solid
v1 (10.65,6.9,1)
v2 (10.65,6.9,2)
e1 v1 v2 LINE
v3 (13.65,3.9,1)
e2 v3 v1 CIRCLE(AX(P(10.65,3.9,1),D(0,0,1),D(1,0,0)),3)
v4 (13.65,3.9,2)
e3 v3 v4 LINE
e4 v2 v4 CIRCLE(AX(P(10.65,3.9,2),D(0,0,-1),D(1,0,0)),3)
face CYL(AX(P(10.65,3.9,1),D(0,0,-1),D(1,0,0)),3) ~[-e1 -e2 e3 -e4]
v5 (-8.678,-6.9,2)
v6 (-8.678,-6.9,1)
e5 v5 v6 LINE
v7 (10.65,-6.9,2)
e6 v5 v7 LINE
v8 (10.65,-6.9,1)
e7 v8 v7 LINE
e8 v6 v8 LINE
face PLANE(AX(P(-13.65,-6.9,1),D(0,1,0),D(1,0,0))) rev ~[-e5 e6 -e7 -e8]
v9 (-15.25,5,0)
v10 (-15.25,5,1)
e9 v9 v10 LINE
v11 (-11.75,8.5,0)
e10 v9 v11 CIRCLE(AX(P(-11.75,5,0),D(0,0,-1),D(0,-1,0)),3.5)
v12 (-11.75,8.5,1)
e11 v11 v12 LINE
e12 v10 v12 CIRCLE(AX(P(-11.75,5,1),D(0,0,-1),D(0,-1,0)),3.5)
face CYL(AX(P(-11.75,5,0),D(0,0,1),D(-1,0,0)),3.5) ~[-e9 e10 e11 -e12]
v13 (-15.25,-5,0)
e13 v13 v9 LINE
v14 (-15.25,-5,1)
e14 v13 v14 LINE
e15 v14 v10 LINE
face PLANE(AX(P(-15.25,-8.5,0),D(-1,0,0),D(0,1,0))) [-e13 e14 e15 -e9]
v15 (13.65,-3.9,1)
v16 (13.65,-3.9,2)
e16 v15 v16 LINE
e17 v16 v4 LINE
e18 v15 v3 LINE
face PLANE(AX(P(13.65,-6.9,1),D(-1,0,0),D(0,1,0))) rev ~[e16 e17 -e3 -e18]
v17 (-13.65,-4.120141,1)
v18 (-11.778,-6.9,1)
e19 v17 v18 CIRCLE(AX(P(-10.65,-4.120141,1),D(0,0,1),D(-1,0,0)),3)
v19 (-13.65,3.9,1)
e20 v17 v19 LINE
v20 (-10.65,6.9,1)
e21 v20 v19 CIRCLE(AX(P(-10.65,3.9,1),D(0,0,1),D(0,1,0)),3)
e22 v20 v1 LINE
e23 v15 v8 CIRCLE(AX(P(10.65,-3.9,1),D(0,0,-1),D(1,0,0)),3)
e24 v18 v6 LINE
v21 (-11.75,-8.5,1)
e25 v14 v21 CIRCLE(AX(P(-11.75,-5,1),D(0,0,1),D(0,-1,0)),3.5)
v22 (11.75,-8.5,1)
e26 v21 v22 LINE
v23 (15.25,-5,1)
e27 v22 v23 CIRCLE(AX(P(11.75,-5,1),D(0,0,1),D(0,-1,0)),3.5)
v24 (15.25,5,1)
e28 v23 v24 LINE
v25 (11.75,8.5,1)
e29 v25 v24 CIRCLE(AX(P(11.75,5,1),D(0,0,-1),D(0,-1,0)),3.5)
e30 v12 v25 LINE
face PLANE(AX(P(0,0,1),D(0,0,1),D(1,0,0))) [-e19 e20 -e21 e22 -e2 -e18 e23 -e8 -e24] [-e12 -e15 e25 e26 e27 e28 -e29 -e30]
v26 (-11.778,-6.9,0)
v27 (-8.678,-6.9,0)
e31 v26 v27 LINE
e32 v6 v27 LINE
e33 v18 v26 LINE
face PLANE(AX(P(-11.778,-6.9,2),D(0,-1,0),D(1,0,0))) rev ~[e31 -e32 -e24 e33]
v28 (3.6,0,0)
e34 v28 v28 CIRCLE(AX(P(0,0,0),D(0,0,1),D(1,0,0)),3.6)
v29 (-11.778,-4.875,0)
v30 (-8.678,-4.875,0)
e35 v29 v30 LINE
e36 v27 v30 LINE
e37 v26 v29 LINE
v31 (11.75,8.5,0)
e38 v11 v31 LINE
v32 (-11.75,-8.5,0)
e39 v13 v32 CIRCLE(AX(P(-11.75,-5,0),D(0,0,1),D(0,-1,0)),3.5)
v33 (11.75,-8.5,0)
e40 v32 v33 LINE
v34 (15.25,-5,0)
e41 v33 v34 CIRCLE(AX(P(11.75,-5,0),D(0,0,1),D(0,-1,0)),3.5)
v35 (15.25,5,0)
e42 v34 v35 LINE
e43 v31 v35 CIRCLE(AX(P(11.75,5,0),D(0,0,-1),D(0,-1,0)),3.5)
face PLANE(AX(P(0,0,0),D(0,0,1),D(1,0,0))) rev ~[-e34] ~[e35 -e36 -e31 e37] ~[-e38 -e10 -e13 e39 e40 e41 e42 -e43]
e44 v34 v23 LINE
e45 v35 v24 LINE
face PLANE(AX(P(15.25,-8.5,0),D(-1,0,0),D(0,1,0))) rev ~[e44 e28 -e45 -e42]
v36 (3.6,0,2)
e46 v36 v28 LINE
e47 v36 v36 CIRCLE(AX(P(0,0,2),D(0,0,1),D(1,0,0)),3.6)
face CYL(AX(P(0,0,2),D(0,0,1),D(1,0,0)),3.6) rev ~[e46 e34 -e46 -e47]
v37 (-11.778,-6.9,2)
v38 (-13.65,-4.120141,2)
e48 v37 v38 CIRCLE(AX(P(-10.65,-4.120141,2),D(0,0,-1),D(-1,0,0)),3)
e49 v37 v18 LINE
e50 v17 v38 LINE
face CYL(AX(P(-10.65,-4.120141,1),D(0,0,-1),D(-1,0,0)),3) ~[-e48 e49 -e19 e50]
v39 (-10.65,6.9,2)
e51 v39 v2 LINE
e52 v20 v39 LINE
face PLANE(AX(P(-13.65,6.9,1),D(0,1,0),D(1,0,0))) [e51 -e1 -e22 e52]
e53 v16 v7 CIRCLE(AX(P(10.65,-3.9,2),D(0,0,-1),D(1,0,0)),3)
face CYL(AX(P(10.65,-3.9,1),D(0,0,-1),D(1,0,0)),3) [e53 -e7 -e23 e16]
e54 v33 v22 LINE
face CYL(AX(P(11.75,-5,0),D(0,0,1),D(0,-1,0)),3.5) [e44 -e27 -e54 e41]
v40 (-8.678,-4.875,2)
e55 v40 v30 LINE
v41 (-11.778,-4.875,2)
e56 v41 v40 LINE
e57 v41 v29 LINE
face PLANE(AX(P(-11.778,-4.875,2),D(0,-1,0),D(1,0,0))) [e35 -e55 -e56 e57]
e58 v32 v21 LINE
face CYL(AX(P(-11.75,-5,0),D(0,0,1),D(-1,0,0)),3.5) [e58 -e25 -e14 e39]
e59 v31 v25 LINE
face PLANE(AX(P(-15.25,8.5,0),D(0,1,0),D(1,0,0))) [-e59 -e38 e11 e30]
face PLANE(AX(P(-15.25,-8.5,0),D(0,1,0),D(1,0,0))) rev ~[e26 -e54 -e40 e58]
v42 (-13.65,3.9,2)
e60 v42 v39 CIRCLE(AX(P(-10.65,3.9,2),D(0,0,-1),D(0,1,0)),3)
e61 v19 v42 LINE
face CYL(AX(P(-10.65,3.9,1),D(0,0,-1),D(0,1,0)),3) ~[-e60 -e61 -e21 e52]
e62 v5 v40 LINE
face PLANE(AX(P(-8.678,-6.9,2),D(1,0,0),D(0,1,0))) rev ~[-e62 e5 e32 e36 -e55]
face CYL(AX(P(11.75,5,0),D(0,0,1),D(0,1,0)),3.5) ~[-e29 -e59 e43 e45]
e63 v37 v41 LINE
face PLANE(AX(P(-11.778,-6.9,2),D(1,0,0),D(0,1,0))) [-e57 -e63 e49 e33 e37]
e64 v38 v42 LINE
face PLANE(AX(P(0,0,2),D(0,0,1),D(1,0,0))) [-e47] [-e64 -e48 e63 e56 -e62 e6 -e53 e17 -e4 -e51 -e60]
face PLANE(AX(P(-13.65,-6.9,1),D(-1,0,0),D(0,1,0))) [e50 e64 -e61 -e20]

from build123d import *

# Parameters (mm, degrees)
F0_W        = 30.5
F0_H        = 17
F1_DEPTH    = 1
F2_W        = 27.3
F2_H        = 13.8
F3_DEPTH    = 1
F4_R        = 3.6
F4_W        = 3.1
F4_H        = 2.025
F5_DEPTH    = 2
F6_T1_DEPTH = 7.9496474731
F6_T3_DEPTH = 8.5
F7_R        = 3.5


# Not quite as in the source:
# - a fillet or chamfer that OpenCascade refuses, or shapes differently, is made with other operations: its cross-section is extruded or revolved along the edge and cut away or added


with BuildPart() as f1:
    # F0 (on Top) → F1 (new body)
    with BuildSketch(Plane.XY):
        Rectangle(F0_W, F0_H)
    extrude(amount=F1_DEPTH)

    # F2 (on face) → F3 (join)
    with BuildSketch(Plane.XY.offset(1)):
        Rectangle(F2_W, F2_H)
    extrude(amount=F3_DEPTH)

    # F4 (on face) → F5 (cut)
    with BuildSketch(Plane.XY.offset(2)):
        Circle(F4_R)
        with Locations((-10.228, -5.8875)):
            Rectangle(F4_W, F4_H)
    extrude(amount=-F5_DEPTH, mode=Mode.SUBTRACT)

    # F6: fillet of radius 3 on 4 edges, made by hand

    # F6_s2 → F6_t1 (cut)
    with BuildSketch(Plane.XY.offset(1)):
        with BuildLine():
            ThreePointArc((-13.65, -4.1201410108), (-13.1383729624, -5.795849816), (-11.778, -6.9))
            Line((-11.778, -6.9), (-13.65, -6.9))
            Line((-13.65, -6.9), (-13.65, -4.1201410108))
        make_face()
    extrude(amount=F6_T1_DEPTH, mode=Mode.SUBTRACT)

    # F6_s4 → F6_t3 (cut)
    with BuildSketch(Plane.XY.offset(1)):
        with BuildLine():
            ThreePointArc((13.65, -3.9), (12.7713203436, -6.0213203436), (10.65, -6.9))
            Line((10.65, -6.9), (13.65, -6.9))
            Line((13.65, -6.9), (13.65, -3.9))
        make_face()
        with BuildLine():
            ThreePointArc((-10.65, 6.9), (-12.7713203436, 6.0213203436), (-13.65, 3.9))
            Line((-13.65, 3.9), (-13.65, 6.9))
            Line((-13.65, 6.9), (-10.65, 6.9))
        make_face()
        with BuildLine():
            ThreePointArc((13.65, 3.9), (12.7713203436, 6.0213203436), (10.65, 6.9))
            Line((10.65, 6.9), (13.65, 6.9))
            Line((13.65, 6.9), (13.65, 3.9))
        make_face()
    extrude(amount=F6_T3_DEPTH, mode=Mode.SUBTRACT)

    # F7
    f7_edges = [f1.edges().sort_by_distance(p)[0] for p in [
        (15.25, 8.5, 0.5),
        (-15.25, 8.5, 0.5),
        (-15.25, -8.5, 0.5),
        (15.25, -8.5, 0.5),
    ]]
    fillet(f7_edges, radius=F7_R)


solid = f1.part
